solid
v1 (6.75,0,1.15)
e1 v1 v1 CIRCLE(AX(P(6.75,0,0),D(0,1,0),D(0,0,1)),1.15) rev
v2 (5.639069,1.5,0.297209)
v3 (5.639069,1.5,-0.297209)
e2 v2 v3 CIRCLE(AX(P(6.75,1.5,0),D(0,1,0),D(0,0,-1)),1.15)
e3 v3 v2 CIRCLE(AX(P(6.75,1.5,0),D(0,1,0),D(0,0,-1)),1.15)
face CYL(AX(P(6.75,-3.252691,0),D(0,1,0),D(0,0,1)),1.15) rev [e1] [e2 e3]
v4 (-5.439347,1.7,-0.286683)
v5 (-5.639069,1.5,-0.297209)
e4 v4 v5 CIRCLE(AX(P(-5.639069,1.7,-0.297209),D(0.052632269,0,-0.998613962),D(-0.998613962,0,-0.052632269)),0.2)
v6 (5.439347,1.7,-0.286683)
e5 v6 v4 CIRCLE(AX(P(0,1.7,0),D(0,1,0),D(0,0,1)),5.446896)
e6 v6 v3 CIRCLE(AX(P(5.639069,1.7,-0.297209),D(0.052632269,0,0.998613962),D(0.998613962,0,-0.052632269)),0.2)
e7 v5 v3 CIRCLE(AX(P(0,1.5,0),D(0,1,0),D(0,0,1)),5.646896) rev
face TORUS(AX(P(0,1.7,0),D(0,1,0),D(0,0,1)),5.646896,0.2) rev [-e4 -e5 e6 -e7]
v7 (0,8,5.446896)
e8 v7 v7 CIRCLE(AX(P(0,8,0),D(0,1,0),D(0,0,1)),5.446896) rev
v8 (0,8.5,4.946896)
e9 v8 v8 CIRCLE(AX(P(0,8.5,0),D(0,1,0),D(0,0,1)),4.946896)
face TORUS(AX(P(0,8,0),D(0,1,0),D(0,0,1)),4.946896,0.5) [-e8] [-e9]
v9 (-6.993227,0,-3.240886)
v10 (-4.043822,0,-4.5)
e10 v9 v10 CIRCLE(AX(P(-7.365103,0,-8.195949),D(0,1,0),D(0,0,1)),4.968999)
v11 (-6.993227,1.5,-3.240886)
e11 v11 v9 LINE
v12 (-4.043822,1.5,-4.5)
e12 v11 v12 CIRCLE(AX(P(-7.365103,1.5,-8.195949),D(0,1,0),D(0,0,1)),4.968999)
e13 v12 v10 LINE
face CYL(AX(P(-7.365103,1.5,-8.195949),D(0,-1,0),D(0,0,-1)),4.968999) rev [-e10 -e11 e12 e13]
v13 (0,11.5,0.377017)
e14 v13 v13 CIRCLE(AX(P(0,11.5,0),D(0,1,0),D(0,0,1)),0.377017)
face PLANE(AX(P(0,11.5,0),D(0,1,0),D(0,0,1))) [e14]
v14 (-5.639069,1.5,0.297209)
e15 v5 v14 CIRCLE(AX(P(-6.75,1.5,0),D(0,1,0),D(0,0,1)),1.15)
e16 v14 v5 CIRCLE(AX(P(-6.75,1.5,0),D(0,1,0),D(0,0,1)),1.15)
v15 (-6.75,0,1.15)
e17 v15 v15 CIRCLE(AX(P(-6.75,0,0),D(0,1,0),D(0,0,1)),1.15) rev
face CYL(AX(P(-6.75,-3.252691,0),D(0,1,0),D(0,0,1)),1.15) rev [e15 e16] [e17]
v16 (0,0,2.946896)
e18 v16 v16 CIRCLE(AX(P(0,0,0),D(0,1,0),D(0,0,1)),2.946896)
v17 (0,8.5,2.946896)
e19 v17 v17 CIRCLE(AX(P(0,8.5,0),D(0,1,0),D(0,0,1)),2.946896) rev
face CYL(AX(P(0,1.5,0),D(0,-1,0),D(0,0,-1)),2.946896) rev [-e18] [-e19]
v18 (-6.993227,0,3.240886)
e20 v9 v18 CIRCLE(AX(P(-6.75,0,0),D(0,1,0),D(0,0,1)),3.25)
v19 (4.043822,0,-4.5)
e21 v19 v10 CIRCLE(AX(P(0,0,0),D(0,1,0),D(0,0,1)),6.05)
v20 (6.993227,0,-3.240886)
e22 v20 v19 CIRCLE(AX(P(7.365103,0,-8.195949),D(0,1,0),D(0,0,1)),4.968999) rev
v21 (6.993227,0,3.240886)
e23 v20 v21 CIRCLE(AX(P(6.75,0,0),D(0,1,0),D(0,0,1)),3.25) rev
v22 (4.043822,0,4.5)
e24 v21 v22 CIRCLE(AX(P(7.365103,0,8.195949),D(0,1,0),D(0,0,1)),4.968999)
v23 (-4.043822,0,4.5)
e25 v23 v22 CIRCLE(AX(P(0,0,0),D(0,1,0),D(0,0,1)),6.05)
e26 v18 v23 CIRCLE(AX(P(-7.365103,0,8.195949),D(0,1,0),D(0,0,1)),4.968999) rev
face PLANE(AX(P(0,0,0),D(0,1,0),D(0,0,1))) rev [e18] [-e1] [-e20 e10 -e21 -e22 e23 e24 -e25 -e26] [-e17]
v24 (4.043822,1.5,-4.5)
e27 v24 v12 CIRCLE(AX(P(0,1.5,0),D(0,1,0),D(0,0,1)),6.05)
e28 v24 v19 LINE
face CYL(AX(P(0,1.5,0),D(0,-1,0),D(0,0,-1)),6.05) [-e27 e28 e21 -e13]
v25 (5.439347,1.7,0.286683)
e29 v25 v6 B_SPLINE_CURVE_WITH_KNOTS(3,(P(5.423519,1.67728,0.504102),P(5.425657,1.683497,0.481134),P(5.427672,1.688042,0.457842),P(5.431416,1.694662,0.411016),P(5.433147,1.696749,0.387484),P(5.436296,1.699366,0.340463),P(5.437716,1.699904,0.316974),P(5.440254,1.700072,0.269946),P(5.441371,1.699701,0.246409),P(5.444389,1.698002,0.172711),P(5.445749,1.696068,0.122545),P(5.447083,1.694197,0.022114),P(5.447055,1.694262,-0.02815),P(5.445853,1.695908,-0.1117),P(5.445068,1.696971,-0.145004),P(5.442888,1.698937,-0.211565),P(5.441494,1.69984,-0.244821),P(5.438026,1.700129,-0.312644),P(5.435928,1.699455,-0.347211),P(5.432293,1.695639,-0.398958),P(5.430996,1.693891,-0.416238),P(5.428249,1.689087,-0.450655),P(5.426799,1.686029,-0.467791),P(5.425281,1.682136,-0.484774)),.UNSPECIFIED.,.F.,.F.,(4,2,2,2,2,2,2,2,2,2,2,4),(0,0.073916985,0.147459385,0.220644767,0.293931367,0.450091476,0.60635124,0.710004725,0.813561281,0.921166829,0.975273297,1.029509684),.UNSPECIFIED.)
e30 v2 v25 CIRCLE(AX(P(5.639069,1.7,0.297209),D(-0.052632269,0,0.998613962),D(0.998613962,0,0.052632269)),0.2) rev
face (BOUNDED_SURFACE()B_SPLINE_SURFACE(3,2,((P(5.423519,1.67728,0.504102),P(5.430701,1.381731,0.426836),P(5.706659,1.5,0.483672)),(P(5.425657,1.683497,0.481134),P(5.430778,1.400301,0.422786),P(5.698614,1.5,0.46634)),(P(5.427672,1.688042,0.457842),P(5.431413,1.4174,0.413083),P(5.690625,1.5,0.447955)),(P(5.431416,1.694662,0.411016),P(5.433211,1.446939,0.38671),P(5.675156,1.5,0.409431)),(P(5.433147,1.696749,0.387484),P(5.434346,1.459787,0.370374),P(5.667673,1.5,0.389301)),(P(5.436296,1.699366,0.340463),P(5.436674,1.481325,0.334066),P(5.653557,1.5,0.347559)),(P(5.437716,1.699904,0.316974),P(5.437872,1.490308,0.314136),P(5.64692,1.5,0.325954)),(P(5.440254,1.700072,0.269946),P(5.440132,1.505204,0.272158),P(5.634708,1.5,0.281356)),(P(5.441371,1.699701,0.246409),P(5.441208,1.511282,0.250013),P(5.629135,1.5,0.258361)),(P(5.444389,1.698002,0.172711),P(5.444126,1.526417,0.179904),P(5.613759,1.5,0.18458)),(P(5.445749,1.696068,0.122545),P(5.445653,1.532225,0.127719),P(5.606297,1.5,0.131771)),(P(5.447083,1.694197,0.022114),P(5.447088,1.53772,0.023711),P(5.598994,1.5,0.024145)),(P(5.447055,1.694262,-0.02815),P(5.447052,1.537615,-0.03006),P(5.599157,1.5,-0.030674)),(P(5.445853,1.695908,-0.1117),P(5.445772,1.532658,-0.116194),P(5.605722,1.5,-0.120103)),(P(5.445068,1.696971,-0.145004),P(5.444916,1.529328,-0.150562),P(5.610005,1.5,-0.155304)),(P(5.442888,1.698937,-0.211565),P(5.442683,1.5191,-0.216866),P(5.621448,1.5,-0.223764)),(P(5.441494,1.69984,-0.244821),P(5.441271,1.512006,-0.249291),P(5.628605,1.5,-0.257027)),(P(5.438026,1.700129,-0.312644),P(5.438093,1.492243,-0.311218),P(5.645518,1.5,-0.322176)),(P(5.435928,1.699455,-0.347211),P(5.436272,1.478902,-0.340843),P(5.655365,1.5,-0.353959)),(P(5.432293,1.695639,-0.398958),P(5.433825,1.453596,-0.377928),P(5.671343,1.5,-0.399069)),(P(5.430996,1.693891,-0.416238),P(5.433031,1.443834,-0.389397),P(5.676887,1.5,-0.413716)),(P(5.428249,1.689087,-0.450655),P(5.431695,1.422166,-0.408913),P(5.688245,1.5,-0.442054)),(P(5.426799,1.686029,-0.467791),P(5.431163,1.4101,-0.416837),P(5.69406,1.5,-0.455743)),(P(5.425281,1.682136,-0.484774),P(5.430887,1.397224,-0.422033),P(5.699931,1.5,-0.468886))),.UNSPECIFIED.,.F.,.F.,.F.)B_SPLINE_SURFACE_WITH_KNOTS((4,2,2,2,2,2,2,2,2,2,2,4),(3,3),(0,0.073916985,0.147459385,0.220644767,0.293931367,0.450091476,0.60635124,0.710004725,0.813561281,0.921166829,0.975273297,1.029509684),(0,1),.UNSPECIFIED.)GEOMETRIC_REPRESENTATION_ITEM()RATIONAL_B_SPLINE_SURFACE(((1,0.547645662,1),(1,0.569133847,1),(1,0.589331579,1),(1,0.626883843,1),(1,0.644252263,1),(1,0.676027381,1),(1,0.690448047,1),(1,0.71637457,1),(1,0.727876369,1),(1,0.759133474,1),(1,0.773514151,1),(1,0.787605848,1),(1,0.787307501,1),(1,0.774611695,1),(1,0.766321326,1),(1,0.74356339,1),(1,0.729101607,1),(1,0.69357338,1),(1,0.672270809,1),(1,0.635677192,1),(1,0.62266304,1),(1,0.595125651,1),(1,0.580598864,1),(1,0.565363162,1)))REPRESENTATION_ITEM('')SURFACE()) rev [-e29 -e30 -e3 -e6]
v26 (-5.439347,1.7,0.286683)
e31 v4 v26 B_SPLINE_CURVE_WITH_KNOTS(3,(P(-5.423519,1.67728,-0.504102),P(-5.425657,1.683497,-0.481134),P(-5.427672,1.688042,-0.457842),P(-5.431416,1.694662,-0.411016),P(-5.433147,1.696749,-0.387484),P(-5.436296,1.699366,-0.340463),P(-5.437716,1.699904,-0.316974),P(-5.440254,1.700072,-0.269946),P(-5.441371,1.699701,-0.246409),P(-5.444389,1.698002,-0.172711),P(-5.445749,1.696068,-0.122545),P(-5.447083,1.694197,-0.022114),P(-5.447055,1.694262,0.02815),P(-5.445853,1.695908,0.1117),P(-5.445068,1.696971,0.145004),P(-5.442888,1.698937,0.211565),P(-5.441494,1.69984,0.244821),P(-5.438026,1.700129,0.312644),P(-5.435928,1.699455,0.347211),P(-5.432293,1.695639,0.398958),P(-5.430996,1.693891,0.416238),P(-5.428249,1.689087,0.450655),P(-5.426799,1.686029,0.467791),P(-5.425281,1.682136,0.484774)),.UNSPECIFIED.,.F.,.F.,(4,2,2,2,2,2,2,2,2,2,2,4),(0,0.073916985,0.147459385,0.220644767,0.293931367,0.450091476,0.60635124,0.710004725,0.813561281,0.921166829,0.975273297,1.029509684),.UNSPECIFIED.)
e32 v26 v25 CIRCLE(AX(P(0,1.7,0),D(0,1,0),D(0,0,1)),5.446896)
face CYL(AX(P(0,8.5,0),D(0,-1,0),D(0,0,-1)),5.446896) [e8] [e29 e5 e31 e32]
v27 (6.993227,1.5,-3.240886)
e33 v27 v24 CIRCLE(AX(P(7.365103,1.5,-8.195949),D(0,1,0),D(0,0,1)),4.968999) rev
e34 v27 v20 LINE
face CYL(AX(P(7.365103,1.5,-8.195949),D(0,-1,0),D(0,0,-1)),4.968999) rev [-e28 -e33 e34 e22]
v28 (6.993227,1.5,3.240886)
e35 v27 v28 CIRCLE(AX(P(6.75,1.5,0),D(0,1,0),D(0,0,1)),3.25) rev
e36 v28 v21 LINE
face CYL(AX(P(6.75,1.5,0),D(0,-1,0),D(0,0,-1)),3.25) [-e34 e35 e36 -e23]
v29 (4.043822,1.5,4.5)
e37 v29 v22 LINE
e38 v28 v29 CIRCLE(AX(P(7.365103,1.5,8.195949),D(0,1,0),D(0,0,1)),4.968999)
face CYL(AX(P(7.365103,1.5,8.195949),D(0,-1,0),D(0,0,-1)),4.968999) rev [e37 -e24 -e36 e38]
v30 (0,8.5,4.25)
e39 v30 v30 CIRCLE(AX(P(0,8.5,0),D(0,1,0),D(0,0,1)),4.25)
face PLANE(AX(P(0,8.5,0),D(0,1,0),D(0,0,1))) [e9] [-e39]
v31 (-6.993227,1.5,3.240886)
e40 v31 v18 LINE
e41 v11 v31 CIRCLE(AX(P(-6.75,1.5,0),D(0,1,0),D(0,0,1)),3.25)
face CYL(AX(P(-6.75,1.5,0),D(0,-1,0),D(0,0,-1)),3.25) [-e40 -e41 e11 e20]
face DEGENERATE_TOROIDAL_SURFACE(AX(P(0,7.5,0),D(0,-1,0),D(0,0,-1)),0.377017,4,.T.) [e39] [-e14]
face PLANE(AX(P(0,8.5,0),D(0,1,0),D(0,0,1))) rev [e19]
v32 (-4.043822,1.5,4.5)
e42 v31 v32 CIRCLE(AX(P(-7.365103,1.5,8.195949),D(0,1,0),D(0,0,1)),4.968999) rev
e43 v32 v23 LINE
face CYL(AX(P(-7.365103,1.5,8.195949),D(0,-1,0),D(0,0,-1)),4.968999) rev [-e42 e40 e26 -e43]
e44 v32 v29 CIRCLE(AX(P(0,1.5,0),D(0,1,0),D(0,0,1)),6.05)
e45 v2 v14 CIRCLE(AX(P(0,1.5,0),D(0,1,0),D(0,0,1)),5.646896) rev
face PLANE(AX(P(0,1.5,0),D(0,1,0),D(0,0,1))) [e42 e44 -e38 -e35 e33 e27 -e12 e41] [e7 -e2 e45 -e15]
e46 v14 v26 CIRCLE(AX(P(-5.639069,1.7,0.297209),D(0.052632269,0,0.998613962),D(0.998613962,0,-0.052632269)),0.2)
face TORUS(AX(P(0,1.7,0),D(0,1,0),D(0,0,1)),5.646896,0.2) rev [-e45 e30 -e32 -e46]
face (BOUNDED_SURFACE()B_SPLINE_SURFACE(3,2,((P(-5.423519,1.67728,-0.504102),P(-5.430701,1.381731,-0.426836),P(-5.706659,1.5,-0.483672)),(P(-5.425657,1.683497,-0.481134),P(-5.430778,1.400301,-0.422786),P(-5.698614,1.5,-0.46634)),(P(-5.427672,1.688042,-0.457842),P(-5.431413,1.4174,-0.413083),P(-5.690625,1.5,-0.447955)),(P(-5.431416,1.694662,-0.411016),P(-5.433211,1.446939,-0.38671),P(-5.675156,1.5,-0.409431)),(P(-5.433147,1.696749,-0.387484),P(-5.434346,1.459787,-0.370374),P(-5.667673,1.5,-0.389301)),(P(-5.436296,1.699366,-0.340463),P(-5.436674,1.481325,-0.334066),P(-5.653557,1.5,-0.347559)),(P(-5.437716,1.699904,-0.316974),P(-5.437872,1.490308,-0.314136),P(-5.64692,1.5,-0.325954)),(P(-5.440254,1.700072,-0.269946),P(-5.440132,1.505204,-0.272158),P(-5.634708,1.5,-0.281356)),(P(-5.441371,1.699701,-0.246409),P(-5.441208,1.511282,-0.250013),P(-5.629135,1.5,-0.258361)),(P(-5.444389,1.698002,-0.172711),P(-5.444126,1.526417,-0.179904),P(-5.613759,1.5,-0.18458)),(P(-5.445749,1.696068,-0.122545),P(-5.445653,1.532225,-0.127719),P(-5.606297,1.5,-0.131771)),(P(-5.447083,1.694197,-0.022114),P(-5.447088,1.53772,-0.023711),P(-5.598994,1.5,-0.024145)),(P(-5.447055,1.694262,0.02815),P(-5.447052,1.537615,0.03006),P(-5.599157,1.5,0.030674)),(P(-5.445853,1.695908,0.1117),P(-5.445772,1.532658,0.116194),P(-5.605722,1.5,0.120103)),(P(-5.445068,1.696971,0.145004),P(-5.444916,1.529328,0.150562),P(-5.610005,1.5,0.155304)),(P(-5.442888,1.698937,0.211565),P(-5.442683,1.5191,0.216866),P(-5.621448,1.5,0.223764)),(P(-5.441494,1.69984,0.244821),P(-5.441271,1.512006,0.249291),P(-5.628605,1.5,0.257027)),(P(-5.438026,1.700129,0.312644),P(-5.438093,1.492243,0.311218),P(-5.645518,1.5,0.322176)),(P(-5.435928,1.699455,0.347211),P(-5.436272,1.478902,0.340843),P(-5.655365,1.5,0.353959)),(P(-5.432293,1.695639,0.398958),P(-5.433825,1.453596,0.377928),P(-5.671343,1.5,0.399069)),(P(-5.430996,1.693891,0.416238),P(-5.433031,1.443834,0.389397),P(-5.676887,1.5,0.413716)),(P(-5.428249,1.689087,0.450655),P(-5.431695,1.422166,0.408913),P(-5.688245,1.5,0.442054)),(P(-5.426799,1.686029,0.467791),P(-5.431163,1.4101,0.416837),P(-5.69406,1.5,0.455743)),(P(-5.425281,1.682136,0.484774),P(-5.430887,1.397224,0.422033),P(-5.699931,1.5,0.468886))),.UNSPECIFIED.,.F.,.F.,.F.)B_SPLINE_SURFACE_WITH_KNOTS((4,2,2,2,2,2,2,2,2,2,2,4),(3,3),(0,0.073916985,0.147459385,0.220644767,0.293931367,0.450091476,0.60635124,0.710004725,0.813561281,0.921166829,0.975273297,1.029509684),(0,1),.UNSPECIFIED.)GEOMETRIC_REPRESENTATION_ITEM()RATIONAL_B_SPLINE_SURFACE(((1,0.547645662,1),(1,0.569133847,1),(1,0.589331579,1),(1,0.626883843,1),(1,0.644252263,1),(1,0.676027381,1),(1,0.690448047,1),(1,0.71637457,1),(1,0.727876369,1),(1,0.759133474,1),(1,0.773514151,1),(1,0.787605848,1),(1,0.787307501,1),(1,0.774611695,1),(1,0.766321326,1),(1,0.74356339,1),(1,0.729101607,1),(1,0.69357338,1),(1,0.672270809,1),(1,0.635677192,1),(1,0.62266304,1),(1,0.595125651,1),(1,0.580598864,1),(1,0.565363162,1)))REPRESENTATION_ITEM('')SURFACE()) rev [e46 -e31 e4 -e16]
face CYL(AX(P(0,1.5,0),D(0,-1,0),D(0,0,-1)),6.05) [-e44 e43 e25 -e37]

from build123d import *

# Parameters (mm, degrees)
SKETCH1_R           = 2.946896199
BOSS_EXTRUDE1_DEPTH = 1.5
SKETCH2_R           = 1.15
CUT_EXTRUDE1_DEPTH  = 1.5
SKETCH3_R           = 5.446896199
SKETCH3_R_2         = 2.946896199
BOSS_EXTRUDE2_DEPTH = 7
SKETCH4_R           = 4.25
BOSS_EXTRUDE3_DEPTH = 3
FILLET1_R           = 4
FILLET2_R           = 0.5
FILLET3_R           = 0.2


with BuildPart() as part:
    # Sketch1 → Boss-Extrude1 (new body)
    with BuildSketch(Plane(origin=(0, 0, 0), x_dir=(1, 0, 0), z_dir=(0, 1, 0))):
        with BuildLine():
            ThreePointArc((-4.043822449, -4.5), (0, -6.05), (4.043822449, -4.5))
            ThreePointArc((4.043822449, -4.5), (5.414156345, -3.625965374), (6.993227337, -3.240885753))
            ThreePointArc((6.993227337, -3.240885753), (10, 0), (6.993227337, 3.240885753))
            ThreePointArc((6.993227337, 3.240885753), (5.414156345, 3.625965374), (4.043822449, 4.5))
            ThreePointArc((4.043822449, 4.5), (0, 6.05), (-4.043822449, 4.5))
            ThreePointArc((-4.043822449, 4.5), (-5.414156345, 3.625965374), (-6.993227337, 3.240885753))
            ThreePointArc((-6.993227337, 3.240885753), (-10, 0), (-6.993227337, -3.240885753))
            ThreePointArc((-6.993227337, -3.240885753), (-5.414156345, -3.625965374), (-4.043822449, -4.5))
        make_face()
        with Locations(Location((0, 0, 0), (0, 0, 270))):
            Circle(SKETCH1_R, mode=Mode.SUBTRACT)
    extrude(amount=BOSS_EXTRUDE1_DEPTH)

    # Sketch2 → Cut-Extrude1 (cut)
    with BuildSketch(Plane(origin=(0, 1.5, 0), x_dir=(1, 0, 0), z_dir=(0, 1, 0))):
        with Locations(Location((-6.75, 0, 0), (0, 0, 270))):
            Circle(SKETCH2_R)
        with Locations(Location((6.75, 0, 0), (0, 0, 270))):
            Circle(SKETCH2_R)
    extrude(amount=-CUT_EXTRUDE1_DEPTH, mode=Mode.SUBTRACT)

    # Sketch3 → Boss-Extrude2 (add)
    with BuildSketch(Plane(origin=(0, 1.5, 0), x_dir=(1, 0, 0), z_dir=(0, 1, 0))):
        with Locations(Location((0, 0, 0), (0, 0, 270))):
            Circle(SKETCH3_R)
        with Locations(Location((0, 0, 0), (0, 0, 270))):
            Circle(SKETCH3_R_2, mode=Mode.SUBTRACT)
    extrude(amount=BOSS_EXTRUDE2_DEPTH)

    # Sketch4 → Boss-Extrude3 (add)
    with BuildSketch(Plane(origin=(0, 8.5, 0), x_dir=(1, 0, 0), z_dir=(0, 1, 0))):
        with Locations(Location((0, 0, 0), (0, 0, 270))):
            Circle(SKETCH4_R)
    extrude(amount=BOSS_EXTRUDE3_DEPTH)

    # Fillet1
    # the kernel refuses this fillet: 4 mm, written as the material it takes off along each edge
    with BuildSketch(Plane(origin=(0, 11.5, 0), x_dir=(0, 0, 1), z_dir=(-1, 0, 0))) as fillet1_piece_1:
        with BuildLine():
            CenterArc((0.377016654, -4), FILLET1_R, 14.477512186, 75.522487814)
            Line((0.377016654, 0), (0.377016654, 0.08))
            Line((0.377016654, 0.08), (4.25, 0.08))
            Line((4.25, 0.08), (4.33, 0))
            ThreePointArc((4.33, 0), (4.33, -1.5), (4.327459667, -2.98))
            Line((4.327459667, -2.98), (4.25, -3))
        make_face()
    revolve(axis=Axis((0, 11.5, 0), (0, 1, 0)), mode=Mode.SUBTRACT)

    # Fillet2
    fillet2_edges = [part.edges().sort_by_distance(p)[0] for p in [
        (0, 8.5, -5.446896199),
    ]]
    fillet(fillet2_edges, radius=FILLET2_R)

    # Fillet3
    fillet3_edges = [part.edges().sort_by_distance(p)[0] for p in [
        (0, 1.5, -5.446896199),
    ]]
    fillet(fillet3_edges, radius=FILLET3_R)


solid = part.part
